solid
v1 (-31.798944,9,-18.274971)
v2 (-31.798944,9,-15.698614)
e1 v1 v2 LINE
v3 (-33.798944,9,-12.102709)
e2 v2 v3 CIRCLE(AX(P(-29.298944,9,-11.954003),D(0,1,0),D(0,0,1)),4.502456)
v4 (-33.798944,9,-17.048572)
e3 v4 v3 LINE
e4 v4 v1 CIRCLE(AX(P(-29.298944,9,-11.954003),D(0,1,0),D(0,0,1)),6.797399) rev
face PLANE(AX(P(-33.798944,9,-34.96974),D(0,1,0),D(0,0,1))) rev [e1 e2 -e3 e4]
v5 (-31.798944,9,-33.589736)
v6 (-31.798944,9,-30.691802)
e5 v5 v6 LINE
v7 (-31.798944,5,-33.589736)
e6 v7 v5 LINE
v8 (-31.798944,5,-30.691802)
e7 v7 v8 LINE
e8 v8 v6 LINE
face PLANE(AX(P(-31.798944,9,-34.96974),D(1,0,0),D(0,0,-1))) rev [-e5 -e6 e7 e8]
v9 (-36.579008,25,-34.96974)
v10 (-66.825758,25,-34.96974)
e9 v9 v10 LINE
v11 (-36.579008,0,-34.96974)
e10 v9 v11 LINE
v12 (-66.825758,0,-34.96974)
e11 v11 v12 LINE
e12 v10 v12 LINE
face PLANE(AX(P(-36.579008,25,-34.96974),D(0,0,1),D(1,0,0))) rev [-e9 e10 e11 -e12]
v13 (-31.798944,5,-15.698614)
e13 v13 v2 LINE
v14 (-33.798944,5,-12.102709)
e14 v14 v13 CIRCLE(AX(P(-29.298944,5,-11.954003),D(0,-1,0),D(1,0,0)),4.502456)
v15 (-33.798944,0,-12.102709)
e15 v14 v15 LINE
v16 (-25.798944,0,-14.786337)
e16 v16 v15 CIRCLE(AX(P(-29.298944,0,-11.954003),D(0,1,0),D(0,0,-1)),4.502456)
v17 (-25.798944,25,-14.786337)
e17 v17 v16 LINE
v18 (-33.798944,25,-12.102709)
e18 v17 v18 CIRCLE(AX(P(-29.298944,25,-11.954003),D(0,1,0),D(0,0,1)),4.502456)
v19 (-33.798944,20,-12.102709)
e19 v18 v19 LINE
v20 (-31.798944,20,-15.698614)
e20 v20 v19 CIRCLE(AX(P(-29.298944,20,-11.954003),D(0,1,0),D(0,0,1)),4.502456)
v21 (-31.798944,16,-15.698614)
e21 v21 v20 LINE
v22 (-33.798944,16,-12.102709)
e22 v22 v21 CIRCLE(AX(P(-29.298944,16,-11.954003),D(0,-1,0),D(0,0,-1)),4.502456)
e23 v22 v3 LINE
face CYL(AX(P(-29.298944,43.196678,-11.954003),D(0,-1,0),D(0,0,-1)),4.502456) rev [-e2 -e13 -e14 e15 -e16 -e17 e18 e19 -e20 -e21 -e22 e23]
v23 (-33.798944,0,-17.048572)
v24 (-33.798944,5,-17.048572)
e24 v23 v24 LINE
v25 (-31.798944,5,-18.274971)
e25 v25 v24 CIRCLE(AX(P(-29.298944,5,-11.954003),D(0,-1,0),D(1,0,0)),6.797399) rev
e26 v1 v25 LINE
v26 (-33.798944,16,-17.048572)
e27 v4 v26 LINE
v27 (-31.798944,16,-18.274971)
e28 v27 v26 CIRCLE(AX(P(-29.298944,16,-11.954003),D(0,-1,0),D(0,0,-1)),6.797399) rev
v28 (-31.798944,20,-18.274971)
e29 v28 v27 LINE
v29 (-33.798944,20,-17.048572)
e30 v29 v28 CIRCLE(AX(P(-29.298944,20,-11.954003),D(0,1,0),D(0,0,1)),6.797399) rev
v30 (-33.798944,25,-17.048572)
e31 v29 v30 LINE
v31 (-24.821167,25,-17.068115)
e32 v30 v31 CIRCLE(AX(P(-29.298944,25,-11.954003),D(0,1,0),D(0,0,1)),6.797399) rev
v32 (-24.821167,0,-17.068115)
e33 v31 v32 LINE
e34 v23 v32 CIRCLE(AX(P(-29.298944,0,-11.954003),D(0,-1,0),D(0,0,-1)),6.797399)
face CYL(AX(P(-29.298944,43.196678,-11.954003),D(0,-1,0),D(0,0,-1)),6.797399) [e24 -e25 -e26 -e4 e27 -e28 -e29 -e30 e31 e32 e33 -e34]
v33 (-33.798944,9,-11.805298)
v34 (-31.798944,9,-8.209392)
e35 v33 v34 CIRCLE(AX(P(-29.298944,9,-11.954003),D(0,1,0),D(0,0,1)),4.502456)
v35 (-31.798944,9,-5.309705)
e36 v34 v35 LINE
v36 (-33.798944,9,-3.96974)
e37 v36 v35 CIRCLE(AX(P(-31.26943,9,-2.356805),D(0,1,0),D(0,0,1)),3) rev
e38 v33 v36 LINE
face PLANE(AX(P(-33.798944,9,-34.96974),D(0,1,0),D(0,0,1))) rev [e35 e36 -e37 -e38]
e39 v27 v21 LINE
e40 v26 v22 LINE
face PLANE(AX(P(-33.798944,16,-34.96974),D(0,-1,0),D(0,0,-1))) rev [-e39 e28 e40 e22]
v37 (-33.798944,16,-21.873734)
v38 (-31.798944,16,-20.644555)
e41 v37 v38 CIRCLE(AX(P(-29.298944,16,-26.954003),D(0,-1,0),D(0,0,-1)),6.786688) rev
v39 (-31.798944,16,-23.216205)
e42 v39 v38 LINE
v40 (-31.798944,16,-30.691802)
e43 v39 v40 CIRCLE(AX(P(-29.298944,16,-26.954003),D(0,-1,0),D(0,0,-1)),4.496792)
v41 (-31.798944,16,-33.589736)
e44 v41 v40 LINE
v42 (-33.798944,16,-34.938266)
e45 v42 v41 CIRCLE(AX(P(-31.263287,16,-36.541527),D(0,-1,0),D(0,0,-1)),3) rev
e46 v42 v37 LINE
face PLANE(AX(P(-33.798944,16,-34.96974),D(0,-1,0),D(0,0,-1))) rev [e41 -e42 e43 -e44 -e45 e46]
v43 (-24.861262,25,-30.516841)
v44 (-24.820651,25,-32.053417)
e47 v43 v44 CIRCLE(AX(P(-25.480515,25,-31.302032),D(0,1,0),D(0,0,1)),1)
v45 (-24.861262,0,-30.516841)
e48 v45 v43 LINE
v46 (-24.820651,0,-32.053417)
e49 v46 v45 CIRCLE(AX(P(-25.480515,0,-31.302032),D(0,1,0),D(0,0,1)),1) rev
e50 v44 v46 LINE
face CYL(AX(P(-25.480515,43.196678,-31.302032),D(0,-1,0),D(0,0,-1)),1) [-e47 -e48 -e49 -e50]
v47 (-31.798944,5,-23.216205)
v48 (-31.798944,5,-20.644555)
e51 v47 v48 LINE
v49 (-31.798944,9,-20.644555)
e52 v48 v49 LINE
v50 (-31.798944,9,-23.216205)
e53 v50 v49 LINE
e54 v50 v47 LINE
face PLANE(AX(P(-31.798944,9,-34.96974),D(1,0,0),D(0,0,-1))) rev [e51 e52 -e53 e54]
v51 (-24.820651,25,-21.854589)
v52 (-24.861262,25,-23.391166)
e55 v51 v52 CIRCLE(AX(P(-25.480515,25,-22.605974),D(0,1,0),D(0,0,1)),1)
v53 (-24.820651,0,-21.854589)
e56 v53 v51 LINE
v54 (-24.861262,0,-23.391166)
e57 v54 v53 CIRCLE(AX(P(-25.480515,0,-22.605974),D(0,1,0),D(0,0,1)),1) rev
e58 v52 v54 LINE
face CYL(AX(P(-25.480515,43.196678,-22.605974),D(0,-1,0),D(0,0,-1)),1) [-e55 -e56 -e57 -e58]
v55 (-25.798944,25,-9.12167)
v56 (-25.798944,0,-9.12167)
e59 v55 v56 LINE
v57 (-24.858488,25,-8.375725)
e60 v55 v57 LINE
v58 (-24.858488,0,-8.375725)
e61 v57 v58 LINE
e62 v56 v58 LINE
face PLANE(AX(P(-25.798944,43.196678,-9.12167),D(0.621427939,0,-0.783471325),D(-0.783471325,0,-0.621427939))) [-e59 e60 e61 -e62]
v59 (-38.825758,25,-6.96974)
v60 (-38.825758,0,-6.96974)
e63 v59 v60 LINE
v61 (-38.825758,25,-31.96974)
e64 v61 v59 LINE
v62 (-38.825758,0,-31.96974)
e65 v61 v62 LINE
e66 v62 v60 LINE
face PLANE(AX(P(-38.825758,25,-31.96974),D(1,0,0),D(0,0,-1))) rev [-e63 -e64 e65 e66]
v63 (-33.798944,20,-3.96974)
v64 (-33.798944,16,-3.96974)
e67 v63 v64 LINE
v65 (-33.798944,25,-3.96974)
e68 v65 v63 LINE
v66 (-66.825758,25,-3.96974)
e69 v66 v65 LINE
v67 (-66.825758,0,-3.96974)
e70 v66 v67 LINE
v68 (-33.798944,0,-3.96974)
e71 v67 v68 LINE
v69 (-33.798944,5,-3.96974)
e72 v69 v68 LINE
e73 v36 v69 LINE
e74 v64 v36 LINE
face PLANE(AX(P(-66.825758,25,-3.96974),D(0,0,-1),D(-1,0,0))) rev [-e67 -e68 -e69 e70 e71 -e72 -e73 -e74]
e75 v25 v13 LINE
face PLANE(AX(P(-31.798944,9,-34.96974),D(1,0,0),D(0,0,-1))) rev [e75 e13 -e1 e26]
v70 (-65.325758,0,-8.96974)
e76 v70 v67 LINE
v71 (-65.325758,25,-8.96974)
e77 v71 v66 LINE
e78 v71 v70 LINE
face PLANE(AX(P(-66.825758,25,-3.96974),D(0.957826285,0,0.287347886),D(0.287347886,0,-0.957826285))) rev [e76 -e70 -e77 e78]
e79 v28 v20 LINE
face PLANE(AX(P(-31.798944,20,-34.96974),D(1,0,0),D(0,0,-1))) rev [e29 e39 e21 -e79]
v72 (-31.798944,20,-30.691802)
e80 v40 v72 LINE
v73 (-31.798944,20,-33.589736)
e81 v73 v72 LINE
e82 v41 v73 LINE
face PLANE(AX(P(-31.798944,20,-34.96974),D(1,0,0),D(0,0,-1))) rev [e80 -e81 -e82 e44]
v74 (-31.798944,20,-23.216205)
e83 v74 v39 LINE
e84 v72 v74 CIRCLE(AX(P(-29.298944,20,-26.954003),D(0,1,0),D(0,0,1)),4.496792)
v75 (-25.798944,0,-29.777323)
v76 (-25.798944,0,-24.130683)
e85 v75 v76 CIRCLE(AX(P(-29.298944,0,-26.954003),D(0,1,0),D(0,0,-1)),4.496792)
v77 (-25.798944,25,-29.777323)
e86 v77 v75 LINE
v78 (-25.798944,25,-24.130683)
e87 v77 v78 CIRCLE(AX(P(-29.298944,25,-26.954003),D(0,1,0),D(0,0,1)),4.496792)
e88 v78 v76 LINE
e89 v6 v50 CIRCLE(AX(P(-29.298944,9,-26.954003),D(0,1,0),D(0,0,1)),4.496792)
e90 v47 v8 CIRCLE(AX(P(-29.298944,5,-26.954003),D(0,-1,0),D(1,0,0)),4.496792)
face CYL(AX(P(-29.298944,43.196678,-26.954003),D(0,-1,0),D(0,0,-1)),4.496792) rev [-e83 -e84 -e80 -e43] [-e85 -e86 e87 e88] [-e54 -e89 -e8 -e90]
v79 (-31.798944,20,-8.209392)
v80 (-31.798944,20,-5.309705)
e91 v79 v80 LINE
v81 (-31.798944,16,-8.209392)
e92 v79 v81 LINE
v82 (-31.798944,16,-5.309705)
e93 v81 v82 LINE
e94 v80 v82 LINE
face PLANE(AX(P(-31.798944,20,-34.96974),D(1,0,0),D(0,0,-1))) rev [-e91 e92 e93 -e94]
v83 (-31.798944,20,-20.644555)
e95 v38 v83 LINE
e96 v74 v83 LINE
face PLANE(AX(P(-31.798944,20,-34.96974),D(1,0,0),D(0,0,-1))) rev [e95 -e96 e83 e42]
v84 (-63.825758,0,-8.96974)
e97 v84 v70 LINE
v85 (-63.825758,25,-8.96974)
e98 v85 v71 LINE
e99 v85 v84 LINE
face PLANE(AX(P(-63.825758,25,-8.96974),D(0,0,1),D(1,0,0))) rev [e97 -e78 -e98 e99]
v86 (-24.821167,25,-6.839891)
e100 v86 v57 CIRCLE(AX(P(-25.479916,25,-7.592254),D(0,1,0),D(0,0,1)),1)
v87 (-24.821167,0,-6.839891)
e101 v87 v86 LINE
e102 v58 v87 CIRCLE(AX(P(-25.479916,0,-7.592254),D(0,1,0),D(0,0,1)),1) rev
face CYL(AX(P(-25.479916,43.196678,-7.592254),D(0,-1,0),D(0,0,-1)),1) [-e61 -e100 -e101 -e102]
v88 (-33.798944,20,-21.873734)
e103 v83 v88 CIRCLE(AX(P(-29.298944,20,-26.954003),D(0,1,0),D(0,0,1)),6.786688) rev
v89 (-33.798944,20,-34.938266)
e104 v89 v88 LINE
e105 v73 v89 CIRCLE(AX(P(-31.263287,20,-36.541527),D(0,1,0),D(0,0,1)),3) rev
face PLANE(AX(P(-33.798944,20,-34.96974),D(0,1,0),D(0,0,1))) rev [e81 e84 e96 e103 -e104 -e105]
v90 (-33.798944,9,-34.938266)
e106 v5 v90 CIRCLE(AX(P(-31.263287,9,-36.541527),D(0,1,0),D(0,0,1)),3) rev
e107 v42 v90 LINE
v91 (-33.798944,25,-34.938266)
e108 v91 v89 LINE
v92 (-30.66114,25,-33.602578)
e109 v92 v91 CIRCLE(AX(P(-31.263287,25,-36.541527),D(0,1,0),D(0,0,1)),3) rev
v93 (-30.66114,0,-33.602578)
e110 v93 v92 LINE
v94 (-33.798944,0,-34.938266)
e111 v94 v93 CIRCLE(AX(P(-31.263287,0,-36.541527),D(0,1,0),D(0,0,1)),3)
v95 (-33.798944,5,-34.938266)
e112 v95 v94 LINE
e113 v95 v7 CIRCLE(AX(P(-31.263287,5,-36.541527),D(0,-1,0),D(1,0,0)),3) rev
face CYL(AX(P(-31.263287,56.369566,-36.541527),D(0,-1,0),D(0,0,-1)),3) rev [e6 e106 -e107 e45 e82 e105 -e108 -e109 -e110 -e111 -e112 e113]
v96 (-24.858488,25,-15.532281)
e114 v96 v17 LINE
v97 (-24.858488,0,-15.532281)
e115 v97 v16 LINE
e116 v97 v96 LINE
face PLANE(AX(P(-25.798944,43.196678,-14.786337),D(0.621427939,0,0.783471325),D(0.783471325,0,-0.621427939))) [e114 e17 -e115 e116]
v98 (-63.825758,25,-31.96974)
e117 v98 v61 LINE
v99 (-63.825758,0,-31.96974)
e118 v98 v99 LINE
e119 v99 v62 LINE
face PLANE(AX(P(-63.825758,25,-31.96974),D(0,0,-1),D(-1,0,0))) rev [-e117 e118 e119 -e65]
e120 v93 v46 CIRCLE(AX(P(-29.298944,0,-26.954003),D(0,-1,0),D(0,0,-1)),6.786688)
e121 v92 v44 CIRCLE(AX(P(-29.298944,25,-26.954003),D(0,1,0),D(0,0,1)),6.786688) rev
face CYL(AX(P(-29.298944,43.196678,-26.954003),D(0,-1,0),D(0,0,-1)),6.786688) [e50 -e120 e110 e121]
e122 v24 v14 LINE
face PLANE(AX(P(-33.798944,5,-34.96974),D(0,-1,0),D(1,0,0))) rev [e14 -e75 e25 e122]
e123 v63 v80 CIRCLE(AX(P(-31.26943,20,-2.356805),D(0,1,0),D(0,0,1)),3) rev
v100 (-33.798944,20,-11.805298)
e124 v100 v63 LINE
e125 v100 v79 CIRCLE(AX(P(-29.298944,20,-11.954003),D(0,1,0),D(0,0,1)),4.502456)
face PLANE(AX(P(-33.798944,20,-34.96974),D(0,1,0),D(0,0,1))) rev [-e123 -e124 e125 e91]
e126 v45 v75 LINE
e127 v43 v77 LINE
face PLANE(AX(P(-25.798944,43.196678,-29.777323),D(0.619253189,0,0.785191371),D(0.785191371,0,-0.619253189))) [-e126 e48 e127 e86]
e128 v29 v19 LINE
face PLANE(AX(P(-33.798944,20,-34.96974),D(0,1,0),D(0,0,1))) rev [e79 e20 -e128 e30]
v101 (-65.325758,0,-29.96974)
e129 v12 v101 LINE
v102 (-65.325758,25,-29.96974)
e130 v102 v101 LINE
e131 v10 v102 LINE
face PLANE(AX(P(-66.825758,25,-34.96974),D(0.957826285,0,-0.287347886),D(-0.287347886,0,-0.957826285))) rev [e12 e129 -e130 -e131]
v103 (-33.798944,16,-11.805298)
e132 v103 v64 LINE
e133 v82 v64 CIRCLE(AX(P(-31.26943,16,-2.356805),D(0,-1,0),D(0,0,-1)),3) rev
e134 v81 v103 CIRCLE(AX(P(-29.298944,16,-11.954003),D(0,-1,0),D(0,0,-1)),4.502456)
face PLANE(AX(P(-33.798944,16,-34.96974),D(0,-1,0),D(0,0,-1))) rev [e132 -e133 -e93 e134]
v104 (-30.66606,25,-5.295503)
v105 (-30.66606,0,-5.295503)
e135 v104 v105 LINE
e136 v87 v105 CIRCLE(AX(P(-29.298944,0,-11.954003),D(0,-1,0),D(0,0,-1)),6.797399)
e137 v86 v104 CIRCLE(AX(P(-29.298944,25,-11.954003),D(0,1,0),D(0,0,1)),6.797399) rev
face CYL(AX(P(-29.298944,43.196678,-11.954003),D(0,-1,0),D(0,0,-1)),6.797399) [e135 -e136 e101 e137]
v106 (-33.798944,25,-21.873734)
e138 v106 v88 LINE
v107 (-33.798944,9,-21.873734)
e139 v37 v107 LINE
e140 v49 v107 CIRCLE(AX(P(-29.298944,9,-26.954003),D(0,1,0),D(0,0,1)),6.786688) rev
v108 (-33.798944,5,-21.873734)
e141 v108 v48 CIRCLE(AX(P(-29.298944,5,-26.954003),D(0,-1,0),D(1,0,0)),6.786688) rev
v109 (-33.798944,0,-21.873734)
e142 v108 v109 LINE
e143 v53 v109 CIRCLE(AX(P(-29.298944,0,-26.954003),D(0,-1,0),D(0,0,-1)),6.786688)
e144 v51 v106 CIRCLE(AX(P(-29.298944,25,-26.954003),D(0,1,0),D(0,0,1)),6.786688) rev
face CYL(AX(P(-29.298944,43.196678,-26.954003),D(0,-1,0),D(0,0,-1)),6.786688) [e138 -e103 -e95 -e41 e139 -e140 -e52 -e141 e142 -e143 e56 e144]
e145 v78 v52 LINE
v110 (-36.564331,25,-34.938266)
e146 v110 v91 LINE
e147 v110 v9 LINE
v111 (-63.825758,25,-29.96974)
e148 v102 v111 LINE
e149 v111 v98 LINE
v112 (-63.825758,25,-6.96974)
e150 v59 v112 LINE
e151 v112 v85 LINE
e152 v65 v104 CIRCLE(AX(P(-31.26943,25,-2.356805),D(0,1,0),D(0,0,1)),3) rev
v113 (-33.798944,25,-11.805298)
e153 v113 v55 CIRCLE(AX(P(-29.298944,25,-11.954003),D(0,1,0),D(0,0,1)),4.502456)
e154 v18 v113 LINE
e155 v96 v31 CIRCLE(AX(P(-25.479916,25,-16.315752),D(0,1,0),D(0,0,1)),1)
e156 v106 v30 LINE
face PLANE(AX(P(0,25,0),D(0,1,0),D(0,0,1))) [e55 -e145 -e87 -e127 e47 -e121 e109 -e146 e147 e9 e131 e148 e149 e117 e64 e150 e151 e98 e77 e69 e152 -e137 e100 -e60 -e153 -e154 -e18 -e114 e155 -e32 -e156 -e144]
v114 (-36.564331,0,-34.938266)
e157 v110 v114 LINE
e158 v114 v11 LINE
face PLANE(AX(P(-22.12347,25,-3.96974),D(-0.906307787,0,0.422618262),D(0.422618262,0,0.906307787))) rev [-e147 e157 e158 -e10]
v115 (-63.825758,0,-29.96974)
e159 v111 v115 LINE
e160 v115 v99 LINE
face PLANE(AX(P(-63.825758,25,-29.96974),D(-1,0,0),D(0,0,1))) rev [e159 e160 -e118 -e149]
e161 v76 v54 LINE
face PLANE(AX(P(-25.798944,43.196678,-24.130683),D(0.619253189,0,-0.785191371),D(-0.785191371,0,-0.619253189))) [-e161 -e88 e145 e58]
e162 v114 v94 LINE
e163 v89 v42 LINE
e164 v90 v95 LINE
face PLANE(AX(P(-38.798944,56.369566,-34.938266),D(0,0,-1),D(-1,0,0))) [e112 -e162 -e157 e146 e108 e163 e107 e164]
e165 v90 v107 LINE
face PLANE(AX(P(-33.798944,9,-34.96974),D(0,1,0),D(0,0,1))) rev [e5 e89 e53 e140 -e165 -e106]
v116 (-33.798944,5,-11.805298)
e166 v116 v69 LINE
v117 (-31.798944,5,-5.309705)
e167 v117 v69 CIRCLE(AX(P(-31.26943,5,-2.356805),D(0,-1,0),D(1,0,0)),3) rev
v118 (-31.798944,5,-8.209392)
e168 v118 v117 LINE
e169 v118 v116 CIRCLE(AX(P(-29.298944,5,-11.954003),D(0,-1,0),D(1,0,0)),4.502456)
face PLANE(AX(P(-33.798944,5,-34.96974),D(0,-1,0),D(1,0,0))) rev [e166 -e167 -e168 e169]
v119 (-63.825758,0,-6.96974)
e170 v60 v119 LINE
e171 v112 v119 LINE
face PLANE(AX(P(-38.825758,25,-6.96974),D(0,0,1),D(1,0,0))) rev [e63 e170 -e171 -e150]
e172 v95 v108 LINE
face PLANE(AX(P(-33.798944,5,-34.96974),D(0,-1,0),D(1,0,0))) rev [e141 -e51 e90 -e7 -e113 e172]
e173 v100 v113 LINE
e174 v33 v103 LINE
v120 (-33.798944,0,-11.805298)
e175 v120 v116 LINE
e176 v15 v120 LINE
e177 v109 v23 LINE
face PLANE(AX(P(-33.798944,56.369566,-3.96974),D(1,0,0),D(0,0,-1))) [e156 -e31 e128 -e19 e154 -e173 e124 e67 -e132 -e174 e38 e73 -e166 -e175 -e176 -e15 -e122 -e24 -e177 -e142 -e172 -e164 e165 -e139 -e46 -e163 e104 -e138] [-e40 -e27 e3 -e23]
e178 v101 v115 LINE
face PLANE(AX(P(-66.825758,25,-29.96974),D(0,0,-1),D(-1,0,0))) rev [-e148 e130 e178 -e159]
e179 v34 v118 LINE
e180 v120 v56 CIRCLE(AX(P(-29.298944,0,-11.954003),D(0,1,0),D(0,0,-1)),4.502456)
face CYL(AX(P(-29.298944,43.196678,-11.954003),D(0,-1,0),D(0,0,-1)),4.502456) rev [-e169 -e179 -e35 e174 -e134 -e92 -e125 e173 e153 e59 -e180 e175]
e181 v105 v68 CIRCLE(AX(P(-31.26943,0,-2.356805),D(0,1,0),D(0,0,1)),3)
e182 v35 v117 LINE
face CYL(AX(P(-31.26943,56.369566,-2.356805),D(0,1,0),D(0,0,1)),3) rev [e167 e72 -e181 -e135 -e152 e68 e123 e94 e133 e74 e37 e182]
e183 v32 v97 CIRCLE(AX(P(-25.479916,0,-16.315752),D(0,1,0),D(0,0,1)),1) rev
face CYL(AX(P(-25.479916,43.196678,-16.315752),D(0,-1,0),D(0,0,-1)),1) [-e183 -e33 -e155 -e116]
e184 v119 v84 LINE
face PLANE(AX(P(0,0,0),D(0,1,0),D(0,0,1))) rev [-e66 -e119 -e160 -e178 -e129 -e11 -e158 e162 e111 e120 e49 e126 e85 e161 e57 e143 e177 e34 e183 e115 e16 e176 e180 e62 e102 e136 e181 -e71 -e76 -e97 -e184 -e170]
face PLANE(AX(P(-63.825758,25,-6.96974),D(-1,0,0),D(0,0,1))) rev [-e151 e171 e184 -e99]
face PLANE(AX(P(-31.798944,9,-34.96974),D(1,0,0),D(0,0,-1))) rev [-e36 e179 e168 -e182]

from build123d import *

# Parameters (mm, degrees)
EXTRUDE_1_DEPTH      = 25
CUT_EXTRUDE_4_DEPTH  = 80.457942189
SKETCH_7_W           = 16.60831278
SKETCH_7_H           = 38.473598513
CUT_EXTRUDE_14_DEPTH = 80.457942189
SKETCH_8_W           = 5
SKETCH_8_H           = 30.968526609
EXTRUDE_2_DEPTH      = 25
EXTRUDE_3_DEPTH      = 25
FILLET_2_R           = 3
FILLET_4_R           = 1
SKETCH_10_W          = 2
SKETCH_10_H          = 4
CUT_EXTRUDE_15_DEPTH = 78.792556685


with BuildPart() as part:
    # Эскиз1 → Бобышка-Вытянуть1 (new body)
    with BuildSketch(Plane(origin=(0, 0, 0), x_dir=(1, 0, 0), z_dir=(0, 1, 0))):
        Polygon((-66.825757576, 34.969739794), (-66.825757576, 29.969739794), (-63.825757576, 29.969739794), (-63.825757576, 31.969739794), (-38.825757576, 31.969739794), (-38.825757576, 6.969739794), (-63.825757576, 6.969739794), (-63.825757576, 8.969739794), (-66.825757576, 8.969739794), (-66.825757576, 3.969739794), (-22.123470102, 3.969739794), (-36.579007505, 34.969739794), align=None)
    extrude(amount=EXTRUDE_1_DEPTH)

    # Эскиз3 → Вырез-Вытянуть4 (cut, through all)
    with BuildSketch(Plane.XZ):
        Polygon((-66.825757576, -3.969739794), (-65.325757576, -8.969739794), (-66.825757576, -8.969739794), align=None)
        Polygon((-66.825757576, -29.969739794), (-66.825757576, -34.969739794), (-65.325757576, -29.969739794), align=None)
    extrude(amount=-CUT_EXTRUDE_4_DEPTH, mode=Mode.SUBTRACT)

    # Эскиз7 → Вырез-Вытянуть14 (cut, through all)
    with BuildSketch(Plane(origin=(0, 0, 0), x_dir=(-1, 0, 0), z_dir=(0, -1, 0))):
        with Locations((27.703474463, 20.539743139)):
            Rectangle(SKETCH_7_W, SKETCH_7_H)
    extrude(amount=-CUT_EXTRUDE_14_DEPTH, mode=Mode.SUBTRACT)

    # Эскиз8 → Бобышка-Вытянуть2 (add)
    with BuildSketch(Plane(origin=(0, 0, 0), x_dir=(-1, 0, 0), z_dir=(0, -1, 0))):
        with Locations((36.298943925, 19.454003098)):
            Rectangle(SKETCH_8_W, SKETCH_8_H)
    extrude(amount=-EXTRUDE_2_DEPTH)

    # Эскиз9 → Бобышка-Вытянуть3 (add)
    with BuildSketch(Plane.XZ):
        with BuildLine():
            Line((-25.798943925, -9.121669553), (-24.000865345, -7.695483003))
            ThreePointArc((-24.000865345, -7.695483003), (-36.096342696, -11.954003099), (-24.000865345, -16.212523195))
            Line((-24.000865345, -16.212523195), (-25.798943925, -14.786336644))
            ThreePointArc((-25.798943925, -14.786336644), (-33.80140029, -11.954003099), (-25.798943925, -9.121669553))
        make_face()
        with BuildLine():
            Line((-25.798943925, -24.130682885), (-24.000865345, -22.7126007))
            ThreePointArc((-24.000865345, -22.7126007), (-36.0856317, -26.954003099), (-24.000865345, -31.195405497))
            Line((-24.000865345, -31.195405497), (-25.798943925, -29.777323313))
            ThreePointArc((-25.798943925, -29.777323313), (-33.795735785, -26.954003099), (-25.798943925, -24.130682885))
        make_face()
    extrude(amount=-EXTRUDE_3_DEPTH)

    # Скругление2
    # the kernel refuses this fillet: 3 mm, written as the material it adds along each edge
    with BuildSketch(Plane(origin=(-33.798943925, 25, -6.859434417), x_dir=(0, 0, 1), z_dir=(0, -1, 0))) as fillet_2_piece_1:
        with BuildLine():
            CenterArc((4.502629254, -2.529514158), FILLET_2_R, 122.523458888, 69.079199353)
            Line((1.563931496, -3.132884263), (1.505157541, -3.144951665))
            ThreePointArc((1.505157541, -3.144951665), (0.933475042, -1.490808901), (-0.044969279, -0.039721077))
            Line((-0.044969279, -0.039721077), (0, 0.06))
            ThreePointArc((0, 0.06), (1.444847312, 0.06), (2.85743593, 0.050590283))
            Line((2.85743593, 0.050590283), (2.889694623, 0))
        make_face()
    extrude(amount=25)
    with BuildSketch(Plane(origin=(-33.798943925, 25, -32.034271886), x_dir=(0, 0, -1), z_dir=(0, -1, 0))) as fillet_2_piece_2:
        with BuildLine():
            CenterArc((4.507255062, 2.535656843), FILLET_2_R, 168.421178081, 69.274223823)
            Line((1.568306542, 3.137804332), (1.509527572, 3.149847282))
            ThreePointArc((1.509527572, 3.149847282), (0.936720457, 1.492647534), (-0.044913828, 0.039783766))
            Line((-0.044913828, 0.039783766), (0, -0.06))
            ThreePointArc((0, -0.06), (1.451997259, -0.06), (2.871929307, -0.050713137))
            Line((2.871929307, -0.050713137), (2.903994517, 0))
        make_face()
    extrude(amount=25)

    # Скругление4
    fillet_4_edges = [part.edges().sort_by_distance(p)[0] for p in [
        (-24.000865345, 12.5, -7.695483003),
        (-24.000865345, 12.5, -16.212523195),
        (-24.000865345, 12.5, -22.7126007),
        (-24.000865345, 12.5, -31.195405497),
    ]]
    fillet(fillet_4_edges, radius=FILLET_4_R)

    # Эскиз10 → Вырез-Вытянуть15 (cut, through all)
    with BuildSketch(Plane.XY.offset(-3.969739794)):
        with Locations((-32.798943925, 18)):
            Rectangle(SKETCH_10_W, SKETCH_10_H)
        with Locations((-32.798943925, 7)):
            Rectangle(SKETCH_10_W, SKETCH_10_H)
    extrude(amount=-CUT_EXTRUDE_15_DEPTH, mode=Mode.SUBTRACT)


solid = part.part
